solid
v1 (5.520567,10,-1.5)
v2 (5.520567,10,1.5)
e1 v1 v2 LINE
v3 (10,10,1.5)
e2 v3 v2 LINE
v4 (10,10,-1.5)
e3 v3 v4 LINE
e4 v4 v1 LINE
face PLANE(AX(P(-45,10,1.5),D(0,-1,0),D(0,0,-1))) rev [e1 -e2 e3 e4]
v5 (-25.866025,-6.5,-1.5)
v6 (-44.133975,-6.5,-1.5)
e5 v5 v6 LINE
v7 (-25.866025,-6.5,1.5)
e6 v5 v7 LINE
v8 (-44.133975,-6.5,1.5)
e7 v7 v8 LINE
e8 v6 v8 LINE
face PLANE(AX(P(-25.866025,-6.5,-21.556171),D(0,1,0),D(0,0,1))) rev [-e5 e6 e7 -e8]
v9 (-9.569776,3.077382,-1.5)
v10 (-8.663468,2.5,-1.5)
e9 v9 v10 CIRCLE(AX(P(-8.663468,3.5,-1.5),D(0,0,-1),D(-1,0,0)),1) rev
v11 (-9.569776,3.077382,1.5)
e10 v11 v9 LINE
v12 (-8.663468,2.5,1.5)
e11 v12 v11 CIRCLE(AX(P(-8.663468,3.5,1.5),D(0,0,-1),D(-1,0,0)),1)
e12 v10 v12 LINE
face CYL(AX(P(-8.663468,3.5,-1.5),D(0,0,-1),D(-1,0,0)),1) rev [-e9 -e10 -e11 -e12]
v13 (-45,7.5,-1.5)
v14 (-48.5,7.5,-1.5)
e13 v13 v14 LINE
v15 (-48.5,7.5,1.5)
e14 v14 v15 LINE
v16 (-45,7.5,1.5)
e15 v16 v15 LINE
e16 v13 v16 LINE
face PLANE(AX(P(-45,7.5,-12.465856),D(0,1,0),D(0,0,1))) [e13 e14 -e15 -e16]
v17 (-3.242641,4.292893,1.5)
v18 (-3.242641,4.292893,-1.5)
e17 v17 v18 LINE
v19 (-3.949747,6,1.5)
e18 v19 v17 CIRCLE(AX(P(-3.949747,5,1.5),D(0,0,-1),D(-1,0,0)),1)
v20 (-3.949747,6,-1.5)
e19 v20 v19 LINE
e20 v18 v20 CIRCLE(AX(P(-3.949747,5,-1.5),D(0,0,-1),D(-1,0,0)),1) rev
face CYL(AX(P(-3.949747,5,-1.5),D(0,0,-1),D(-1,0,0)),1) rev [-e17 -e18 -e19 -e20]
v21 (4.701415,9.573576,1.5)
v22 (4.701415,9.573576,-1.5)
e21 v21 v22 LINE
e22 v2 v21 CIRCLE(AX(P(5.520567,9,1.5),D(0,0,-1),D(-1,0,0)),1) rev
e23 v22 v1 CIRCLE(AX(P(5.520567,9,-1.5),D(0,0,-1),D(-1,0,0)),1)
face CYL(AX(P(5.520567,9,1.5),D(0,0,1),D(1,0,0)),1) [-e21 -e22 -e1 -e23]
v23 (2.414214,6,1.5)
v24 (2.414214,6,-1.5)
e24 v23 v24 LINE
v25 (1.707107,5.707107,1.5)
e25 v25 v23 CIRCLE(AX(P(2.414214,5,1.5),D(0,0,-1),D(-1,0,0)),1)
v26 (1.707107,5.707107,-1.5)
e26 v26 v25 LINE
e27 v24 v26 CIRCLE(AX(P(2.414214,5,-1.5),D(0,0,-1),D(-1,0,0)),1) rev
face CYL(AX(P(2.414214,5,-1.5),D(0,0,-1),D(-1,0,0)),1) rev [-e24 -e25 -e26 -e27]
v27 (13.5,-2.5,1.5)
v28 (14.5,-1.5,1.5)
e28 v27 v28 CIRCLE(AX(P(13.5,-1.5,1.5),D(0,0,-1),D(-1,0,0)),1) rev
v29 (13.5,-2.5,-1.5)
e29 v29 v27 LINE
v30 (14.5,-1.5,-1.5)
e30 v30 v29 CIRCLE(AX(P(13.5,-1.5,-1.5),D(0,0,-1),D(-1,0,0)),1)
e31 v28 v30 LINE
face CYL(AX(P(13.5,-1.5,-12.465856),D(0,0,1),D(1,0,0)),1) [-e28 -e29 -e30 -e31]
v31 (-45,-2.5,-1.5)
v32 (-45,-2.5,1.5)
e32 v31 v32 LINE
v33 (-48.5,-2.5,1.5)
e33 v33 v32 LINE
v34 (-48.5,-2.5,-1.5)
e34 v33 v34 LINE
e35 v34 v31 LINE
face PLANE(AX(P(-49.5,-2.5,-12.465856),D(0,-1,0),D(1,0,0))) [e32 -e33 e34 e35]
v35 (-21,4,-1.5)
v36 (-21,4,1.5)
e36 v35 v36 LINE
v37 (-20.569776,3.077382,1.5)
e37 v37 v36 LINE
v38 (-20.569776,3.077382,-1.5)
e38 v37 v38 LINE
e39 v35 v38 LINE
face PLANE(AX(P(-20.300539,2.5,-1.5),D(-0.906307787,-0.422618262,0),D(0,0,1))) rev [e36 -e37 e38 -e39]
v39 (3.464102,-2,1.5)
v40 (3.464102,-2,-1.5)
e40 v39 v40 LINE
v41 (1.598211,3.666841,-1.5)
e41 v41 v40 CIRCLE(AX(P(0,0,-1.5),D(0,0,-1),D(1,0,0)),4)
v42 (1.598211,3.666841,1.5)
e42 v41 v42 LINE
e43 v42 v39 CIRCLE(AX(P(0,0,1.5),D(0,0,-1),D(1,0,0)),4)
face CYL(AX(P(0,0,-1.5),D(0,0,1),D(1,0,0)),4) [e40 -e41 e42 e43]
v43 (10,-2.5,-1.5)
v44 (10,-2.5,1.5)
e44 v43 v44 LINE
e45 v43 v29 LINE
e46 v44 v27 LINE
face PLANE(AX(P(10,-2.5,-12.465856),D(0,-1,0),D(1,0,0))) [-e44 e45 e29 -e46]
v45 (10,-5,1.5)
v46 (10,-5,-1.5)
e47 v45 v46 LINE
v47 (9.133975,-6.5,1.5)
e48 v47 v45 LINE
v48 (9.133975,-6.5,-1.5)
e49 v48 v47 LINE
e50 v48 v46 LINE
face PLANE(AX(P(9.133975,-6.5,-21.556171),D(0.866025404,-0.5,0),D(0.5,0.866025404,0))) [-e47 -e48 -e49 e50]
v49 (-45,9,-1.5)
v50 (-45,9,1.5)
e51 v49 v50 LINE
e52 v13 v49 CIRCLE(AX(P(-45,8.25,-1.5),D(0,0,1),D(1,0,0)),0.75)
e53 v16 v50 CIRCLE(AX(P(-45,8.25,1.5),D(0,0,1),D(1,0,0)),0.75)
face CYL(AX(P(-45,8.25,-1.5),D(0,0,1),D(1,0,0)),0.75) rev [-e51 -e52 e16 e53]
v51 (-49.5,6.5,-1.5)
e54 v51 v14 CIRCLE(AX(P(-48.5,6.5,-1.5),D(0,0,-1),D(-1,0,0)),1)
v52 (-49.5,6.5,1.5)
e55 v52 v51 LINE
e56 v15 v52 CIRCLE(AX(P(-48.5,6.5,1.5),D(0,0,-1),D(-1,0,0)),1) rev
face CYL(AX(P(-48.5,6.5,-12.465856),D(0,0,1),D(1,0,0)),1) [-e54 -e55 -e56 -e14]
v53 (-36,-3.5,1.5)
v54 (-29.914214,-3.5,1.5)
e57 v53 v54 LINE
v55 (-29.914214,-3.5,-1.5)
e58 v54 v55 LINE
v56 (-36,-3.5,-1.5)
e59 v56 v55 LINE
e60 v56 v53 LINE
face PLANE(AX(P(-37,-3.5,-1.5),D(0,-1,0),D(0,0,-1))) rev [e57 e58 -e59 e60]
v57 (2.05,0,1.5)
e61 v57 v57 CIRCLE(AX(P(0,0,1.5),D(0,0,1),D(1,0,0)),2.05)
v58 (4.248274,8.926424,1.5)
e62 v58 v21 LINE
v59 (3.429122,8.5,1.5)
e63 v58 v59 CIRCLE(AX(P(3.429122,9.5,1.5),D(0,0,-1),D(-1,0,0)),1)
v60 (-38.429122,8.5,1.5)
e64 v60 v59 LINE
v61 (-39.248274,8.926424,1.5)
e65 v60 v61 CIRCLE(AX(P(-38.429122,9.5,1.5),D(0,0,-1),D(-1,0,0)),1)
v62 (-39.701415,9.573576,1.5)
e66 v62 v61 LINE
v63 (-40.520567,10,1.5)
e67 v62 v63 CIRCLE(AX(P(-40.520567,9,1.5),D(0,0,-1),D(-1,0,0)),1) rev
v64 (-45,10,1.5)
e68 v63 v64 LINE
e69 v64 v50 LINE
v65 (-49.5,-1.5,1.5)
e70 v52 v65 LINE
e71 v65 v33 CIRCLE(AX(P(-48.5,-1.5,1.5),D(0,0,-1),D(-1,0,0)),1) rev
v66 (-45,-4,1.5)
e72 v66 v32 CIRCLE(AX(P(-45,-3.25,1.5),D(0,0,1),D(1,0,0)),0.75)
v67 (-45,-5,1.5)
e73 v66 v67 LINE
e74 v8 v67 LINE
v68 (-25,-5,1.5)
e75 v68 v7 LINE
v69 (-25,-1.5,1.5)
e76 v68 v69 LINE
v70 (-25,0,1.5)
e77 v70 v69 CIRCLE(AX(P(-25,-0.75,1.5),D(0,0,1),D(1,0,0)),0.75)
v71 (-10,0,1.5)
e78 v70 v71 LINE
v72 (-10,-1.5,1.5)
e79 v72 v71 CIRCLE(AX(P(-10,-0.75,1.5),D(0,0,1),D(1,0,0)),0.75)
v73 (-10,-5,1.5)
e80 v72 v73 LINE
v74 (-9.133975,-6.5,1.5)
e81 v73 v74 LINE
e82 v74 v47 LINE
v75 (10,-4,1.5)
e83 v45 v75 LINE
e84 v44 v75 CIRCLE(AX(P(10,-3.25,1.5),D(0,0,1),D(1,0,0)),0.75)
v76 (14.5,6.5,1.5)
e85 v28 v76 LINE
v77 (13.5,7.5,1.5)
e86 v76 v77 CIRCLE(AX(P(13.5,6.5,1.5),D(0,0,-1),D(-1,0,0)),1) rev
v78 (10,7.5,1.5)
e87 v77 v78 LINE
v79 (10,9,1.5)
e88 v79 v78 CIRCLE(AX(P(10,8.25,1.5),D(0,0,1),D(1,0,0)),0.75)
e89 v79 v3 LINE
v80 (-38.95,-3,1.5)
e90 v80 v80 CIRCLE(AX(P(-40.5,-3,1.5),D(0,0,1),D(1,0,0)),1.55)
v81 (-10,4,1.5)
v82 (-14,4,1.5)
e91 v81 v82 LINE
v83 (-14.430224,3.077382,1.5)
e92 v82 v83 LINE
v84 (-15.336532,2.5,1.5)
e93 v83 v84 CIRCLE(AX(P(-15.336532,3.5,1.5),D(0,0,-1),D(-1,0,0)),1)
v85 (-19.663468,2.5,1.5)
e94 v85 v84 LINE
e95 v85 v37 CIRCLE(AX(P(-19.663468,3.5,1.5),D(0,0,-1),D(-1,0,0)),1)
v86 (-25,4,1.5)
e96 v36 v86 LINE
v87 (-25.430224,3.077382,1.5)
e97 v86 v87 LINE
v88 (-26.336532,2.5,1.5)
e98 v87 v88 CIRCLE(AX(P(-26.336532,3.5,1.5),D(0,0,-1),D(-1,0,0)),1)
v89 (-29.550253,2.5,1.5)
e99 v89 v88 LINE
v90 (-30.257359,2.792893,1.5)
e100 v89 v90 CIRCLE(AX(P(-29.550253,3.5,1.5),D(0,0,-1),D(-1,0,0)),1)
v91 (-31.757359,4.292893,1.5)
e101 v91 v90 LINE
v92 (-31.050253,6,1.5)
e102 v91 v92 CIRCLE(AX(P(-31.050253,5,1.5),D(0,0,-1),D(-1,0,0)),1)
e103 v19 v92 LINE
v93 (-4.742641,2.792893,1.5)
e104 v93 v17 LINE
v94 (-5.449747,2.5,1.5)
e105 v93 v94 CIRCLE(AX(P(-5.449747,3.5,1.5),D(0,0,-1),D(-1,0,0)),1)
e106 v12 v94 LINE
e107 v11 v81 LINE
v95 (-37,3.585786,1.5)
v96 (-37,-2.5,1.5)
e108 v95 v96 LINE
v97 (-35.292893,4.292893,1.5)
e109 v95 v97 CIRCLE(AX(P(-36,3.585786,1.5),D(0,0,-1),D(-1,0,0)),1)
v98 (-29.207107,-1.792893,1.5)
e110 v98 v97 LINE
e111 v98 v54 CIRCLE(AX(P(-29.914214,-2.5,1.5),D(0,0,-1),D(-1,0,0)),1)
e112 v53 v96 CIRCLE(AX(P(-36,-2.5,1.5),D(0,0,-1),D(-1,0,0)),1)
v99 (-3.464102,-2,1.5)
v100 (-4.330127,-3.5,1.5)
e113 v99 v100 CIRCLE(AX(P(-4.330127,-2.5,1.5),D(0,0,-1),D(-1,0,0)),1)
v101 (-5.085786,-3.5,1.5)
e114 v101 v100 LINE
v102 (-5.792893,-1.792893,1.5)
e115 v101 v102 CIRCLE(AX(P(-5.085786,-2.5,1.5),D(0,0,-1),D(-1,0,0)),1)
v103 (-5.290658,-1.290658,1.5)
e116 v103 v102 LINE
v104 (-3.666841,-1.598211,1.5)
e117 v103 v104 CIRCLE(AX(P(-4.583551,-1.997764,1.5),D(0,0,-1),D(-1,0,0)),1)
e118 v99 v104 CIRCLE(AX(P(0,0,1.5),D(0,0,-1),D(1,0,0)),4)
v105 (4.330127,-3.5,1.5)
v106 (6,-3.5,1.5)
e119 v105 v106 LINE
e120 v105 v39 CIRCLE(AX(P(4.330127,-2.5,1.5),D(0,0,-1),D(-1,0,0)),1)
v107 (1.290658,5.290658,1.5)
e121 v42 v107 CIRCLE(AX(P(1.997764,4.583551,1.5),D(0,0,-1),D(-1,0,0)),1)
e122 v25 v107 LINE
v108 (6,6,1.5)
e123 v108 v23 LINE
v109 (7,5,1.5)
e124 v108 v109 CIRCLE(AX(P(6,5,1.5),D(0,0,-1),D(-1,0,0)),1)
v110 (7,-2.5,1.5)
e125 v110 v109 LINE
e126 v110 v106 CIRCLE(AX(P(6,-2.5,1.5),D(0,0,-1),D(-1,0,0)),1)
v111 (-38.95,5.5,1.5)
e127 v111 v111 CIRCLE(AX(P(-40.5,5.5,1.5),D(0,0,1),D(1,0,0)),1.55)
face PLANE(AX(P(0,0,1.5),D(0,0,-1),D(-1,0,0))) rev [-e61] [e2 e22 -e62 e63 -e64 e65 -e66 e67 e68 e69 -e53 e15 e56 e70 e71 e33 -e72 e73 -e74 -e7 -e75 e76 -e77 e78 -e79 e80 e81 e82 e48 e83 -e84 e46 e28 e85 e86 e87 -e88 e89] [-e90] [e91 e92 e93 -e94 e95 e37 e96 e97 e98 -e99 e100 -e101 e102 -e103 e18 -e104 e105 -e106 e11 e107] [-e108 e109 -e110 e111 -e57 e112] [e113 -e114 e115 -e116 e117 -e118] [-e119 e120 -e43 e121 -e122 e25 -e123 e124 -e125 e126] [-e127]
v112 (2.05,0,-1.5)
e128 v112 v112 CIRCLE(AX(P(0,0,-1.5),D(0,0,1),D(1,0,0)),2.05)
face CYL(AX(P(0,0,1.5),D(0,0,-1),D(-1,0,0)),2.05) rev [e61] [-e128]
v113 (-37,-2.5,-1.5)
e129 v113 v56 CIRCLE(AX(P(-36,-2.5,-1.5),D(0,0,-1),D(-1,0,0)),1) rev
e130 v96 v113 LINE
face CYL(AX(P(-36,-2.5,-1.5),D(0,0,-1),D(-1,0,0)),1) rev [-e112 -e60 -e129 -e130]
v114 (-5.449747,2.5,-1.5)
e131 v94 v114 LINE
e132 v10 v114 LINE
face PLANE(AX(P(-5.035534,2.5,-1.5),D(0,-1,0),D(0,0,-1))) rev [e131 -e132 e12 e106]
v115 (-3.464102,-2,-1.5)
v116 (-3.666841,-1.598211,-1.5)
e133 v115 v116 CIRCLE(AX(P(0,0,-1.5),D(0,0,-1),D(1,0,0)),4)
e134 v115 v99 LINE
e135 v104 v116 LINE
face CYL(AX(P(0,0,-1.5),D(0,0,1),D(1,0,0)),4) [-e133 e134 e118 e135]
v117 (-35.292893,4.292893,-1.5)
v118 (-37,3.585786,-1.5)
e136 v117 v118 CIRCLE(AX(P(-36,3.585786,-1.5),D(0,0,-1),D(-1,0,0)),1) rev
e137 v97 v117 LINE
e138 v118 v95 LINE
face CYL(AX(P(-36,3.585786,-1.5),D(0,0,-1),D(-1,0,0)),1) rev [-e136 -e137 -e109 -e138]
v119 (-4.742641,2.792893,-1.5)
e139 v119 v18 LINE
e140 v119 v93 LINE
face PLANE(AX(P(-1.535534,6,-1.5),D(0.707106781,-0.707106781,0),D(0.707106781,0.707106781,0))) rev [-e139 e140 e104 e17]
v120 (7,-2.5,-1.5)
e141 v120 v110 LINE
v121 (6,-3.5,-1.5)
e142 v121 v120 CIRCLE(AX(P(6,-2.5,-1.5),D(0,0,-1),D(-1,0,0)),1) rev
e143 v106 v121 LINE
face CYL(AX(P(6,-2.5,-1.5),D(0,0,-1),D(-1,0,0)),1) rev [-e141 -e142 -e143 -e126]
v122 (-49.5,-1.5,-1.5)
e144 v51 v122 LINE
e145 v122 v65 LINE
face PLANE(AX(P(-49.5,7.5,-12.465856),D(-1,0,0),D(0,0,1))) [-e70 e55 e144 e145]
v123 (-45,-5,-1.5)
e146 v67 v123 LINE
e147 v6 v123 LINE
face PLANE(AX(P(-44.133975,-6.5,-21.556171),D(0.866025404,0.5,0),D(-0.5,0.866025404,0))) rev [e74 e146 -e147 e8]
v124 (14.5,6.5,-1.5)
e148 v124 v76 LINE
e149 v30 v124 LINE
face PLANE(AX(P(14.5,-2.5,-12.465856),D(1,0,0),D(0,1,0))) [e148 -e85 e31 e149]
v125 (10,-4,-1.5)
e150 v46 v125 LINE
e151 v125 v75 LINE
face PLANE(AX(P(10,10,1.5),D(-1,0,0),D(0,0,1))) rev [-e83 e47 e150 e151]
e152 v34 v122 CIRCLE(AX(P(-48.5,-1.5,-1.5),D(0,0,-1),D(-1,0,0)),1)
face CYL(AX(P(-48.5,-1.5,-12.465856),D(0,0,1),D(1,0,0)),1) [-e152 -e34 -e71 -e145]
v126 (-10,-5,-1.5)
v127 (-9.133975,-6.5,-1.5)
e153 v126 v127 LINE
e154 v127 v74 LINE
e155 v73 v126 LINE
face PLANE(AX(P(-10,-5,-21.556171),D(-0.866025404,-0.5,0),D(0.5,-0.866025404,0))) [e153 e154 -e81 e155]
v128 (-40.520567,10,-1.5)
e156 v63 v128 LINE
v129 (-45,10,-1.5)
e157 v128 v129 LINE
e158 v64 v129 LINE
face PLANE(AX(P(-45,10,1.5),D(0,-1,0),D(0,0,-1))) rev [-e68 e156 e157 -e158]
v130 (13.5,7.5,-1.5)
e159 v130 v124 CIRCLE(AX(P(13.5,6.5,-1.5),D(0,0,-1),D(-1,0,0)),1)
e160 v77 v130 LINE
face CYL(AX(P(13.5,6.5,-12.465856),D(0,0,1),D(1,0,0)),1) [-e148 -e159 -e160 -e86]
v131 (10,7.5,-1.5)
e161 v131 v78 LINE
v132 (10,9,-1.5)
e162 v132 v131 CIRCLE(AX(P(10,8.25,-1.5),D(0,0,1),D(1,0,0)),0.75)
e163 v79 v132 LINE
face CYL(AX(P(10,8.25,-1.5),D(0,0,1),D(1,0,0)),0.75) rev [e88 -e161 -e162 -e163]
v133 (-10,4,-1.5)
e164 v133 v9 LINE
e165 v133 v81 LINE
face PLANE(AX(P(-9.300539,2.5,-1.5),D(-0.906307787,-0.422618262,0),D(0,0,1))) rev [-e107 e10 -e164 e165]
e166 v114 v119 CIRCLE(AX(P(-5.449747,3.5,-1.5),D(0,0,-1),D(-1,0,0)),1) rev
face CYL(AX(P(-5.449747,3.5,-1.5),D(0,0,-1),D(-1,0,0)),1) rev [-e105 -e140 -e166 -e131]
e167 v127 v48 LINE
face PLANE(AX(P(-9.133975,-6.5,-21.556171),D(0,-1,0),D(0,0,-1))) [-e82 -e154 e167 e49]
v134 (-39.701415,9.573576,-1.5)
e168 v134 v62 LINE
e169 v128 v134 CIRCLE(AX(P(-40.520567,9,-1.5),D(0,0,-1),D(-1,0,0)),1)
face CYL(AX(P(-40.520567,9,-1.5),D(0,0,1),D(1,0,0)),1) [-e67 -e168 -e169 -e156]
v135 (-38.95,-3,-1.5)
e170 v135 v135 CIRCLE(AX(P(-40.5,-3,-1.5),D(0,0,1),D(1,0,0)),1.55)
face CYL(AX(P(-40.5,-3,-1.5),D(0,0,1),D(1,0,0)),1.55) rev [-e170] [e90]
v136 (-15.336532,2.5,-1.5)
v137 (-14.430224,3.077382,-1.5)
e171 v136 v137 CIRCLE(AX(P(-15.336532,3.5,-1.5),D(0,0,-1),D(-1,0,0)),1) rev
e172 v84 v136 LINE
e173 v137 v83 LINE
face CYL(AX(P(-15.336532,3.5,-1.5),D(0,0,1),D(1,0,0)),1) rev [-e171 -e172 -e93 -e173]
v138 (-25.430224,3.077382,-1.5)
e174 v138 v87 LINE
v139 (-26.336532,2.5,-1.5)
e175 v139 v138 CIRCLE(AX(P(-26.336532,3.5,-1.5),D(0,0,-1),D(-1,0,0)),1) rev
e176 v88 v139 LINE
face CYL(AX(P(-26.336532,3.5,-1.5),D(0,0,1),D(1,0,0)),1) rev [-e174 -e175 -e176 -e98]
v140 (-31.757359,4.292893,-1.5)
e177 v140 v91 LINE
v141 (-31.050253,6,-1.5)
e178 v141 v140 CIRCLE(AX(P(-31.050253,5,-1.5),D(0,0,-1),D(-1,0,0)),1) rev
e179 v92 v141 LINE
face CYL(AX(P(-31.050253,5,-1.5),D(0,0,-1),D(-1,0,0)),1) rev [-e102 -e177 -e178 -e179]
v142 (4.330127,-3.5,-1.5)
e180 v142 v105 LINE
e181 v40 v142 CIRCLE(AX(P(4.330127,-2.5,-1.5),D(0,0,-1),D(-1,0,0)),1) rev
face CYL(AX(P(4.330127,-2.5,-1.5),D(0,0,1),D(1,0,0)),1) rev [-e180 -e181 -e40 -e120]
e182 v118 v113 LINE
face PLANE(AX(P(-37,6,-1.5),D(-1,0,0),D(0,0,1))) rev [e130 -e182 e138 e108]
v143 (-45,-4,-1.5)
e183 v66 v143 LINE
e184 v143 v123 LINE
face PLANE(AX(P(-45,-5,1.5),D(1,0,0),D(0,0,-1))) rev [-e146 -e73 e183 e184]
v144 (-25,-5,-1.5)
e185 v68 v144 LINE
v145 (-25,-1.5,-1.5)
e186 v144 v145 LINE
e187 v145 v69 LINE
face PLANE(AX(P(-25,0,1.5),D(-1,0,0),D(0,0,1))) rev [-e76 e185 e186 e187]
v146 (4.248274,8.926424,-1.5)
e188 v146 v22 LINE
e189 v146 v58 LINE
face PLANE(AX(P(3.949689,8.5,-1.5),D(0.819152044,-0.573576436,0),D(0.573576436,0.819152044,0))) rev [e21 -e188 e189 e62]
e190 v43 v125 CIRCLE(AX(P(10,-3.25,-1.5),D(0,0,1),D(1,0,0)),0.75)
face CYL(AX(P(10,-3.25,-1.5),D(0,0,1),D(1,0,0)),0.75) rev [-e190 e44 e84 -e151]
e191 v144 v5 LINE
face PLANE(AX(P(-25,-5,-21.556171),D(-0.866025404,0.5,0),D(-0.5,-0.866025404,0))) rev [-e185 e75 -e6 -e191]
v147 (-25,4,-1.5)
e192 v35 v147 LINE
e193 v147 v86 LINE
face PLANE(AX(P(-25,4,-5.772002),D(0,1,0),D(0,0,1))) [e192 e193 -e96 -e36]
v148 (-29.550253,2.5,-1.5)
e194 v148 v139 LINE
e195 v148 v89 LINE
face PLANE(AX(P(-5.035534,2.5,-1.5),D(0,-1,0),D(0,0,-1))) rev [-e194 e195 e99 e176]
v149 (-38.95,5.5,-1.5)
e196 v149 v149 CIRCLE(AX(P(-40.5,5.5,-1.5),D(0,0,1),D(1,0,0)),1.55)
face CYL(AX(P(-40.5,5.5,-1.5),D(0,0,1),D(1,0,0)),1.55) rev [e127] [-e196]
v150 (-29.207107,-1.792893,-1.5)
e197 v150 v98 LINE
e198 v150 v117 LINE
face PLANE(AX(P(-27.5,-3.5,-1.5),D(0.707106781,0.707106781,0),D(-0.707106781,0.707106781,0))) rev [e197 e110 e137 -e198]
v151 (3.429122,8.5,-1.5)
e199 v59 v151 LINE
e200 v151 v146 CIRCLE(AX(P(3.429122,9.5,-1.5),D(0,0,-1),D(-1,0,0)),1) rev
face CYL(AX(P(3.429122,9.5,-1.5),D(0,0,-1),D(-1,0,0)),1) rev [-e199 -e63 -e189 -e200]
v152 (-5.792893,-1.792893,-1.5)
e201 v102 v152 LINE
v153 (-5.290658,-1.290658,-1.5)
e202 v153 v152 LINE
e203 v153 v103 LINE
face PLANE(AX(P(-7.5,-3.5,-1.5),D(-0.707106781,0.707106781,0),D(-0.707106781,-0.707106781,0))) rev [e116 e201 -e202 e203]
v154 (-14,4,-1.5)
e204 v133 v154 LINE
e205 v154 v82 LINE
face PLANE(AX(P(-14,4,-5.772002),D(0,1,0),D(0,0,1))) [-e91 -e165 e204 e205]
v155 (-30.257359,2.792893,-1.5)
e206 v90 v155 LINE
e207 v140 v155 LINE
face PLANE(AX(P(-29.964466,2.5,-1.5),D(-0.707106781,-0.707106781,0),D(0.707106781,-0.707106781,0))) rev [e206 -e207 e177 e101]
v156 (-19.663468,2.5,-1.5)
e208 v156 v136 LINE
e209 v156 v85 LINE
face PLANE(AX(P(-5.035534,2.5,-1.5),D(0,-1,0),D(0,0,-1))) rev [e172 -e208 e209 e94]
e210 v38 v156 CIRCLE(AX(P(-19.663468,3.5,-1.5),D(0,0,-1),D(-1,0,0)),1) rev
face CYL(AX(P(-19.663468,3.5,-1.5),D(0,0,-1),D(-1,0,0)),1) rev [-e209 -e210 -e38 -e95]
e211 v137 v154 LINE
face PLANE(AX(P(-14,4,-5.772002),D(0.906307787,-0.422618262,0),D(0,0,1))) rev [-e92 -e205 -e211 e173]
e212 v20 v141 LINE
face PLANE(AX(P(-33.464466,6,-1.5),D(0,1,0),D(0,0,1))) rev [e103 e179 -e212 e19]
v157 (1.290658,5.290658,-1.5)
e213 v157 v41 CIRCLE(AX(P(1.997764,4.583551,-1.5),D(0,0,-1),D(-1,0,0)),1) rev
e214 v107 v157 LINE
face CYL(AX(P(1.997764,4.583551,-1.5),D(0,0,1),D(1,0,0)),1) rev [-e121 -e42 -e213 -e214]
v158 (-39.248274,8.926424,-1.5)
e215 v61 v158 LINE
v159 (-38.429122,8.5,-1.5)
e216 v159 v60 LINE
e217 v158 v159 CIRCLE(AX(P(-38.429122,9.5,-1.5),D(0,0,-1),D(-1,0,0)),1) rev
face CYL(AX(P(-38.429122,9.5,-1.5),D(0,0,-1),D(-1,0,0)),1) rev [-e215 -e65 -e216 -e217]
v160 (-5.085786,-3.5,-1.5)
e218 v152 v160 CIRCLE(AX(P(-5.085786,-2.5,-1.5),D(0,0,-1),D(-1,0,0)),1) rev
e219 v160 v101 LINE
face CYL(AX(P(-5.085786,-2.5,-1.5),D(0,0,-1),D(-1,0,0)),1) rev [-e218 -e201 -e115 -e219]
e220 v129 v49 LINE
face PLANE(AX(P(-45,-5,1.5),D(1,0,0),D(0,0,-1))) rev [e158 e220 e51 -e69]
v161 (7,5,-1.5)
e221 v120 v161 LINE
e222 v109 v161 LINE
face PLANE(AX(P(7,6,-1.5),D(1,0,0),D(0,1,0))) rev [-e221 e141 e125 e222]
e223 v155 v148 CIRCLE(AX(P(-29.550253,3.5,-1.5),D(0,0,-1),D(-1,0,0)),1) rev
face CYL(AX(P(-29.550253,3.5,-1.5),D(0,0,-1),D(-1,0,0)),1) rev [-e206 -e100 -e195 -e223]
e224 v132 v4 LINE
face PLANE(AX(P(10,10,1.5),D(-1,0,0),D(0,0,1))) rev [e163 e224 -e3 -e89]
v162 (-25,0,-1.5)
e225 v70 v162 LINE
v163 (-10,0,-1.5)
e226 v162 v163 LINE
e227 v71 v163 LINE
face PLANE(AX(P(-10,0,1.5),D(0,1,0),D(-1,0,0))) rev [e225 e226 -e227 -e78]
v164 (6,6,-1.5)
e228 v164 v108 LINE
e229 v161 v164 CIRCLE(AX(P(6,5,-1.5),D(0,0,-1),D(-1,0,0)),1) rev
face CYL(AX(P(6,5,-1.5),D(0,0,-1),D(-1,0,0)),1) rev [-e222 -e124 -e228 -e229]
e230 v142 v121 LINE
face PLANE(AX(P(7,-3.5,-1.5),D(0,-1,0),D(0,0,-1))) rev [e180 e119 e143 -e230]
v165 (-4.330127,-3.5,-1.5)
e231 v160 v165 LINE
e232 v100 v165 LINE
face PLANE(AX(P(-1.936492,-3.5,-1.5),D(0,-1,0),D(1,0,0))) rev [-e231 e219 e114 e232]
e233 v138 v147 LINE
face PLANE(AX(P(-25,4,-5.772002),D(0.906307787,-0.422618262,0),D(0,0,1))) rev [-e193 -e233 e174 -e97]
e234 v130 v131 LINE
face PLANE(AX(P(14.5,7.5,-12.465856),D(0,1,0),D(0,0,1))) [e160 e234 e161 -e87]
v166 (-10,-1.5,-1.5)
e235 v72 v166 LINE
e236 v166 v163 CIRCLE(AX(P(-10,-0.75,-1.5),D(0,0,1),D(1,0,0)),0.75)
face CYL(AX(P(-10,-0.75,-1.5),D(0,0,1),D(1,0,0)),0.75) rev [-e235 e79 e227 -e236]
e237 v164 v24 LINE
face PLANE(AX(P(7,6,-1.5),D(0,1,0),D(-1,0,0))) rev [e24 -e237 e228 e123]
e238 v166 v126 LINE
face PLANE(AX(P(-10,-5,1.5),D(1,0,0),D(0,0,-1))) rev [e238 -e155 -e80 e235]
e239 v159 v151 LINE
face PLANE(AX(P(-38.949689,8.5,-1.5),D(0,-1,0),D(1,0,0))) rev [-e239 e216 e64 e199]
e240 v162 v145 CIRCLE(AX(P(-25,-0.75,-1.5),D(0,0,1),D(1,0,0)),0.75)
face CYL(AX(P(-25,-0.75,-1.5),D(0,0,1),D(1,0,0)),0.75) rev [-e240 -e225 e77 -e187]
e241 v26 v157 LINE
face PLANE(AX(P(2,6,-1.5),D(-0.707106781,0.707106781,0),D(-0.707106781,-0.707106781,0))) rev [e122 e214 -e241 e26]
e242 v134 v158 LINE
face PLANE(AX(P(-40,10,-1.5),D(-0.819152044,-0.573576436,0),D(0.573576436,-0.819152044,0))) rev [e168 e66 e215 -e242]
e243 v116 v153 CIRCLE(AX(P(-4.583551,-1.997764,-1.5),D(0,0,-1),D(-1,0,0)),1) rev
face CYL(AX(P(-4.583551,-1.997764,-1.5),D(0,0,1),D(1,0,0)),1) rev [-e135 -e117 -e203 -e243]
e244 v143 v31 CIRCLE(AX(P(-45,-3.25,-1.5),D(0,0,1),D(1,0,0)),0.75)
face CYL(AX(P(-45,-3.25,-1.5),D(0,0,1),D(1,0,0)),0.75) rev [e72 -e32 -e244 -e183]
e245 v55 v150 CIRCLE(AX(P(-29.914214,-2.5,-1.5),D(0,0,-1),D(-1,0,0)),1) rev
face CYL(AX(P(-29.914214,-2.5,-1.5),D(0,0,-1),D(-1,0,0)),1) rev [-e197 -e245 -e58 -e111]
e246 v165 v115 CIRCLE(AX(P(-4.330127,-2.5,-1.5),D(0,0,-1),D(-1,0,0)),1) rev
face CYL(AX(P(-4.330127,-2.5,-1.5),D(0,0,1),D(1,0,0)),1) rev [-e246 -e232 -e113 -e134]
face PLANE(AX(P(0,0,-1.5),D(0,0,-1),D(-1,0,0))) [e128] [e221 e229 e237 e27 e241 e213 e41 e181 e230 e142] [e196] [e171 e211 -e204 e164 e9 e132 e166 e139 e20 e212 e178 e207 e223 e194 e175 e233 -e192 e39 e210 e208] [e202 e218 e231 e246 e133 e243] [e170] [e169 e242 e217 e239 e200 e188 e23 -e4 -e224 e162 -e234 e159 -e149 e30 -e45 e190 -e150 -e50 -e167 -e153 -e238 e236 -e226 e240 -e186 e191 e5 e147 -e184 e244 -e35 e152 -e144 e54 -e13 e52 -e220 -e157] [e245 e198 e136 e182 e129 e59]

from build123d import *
from OCP.BRepFilletAPI import BRepFilletAPI_MakeChamfer

# Parameters (mm, degrees)
SKETCH_1_R          = 2.05
EXTRUDE_1_DEPTH     = 1.5
SKETCH_2_W          = 4.5
SKETCH_2_H          = 10
EXTRUDE_2_DEPTH     = 3
SKETCH_3_R          = 0.75
CUT_EXTRUDE_1_DEPTH = 51.589030432
FILLET_1_R          = 1
EXTRUDE_3_DEPTH     = 3
CUT_EXTRUDE_2_DEPTH = 51.589030432
FILLET_2_R          = 1
SKETCH_6_R          = 1.55
CUT_EXTRUDE_3_DEPTH = 51.589030432
CUT_EXTRUDE_4_DEPTH = 51.589030432
FILLET_3_R          = 1
CUT_EXTRUDE_5_DEPTH = 51.589030432
FILLET_4_R          = 1
SKETCH_9_W          = 4
SKETCH_9_H          = 1.5
EXTRUDE_4_DEPTH     = 3
CHAMFER_1_SIZE      = 0.699461487
CHAMFER_1_SIZE_2    = 1.5
FILLET_5_R          = 1


with BuildPart() as part:
    # 草图1 → 凸台-拉伸1 (new, symmetric)
    with BuildSketch(Plane.XY):
        Polygon((10, 10), (10, -5), (-10, -5), (-10, 0), (-25, 0), (-25, -5), (-45, -5), (-45, 10), align=None)
        Circle(SKETCH_1_R, mode=Mode.SUBTRACT)
    extrude(amount=EXTRUDE_1_DEPTH, both=True)

    # 草图2 → 凸台-拉伸2 (add)
    with BuildSketch(Plane.XY.offset(1.5)):
        with Locations((12.25, 2.5)):
            Rectangle(SKETCH_2_W, SKETCH_2_H)
        with Locations((-47.25, 2.5)):
            Rectangle(SKETCH_2_W, SKETCH_2_H)
    extrude(amount=-EXTRUDE_2_DEPTH)

    # 草图3 → 切除-拉伸1 (cut, through all)
    with BuildSketch(Plane.XY.offset(1.5)):
        with Locations((-45, 8.25)):
            Circle(SKETCH_3_R)
        with Locations((-45, -3.25)):
            Circle(SKETCH_3_R)
        with Locations((10, 8.25)):
            Circle(SKETCH_3_R)
        with Locations((10, -3.25)):
            Circle(SKETCH_3_R)
        with Locations((-25, -0.75)):
            Circle(SKETCH_3_R)
        with Locations((-10, -0.75)):
            Circle(SKETCH_3_R)
    extrude(amount=-CUT_EXTRUDE_1_DEPTH, mode=Mode.SUBTRACT)

    # 圆角1
    fillet_1_edges = [part.edges().sort_by_distance(p)[0] for p in [
        (14.5, -2.5, 0),
        (14.5, 7.5, 0),
        (-49.5, 7.5, 0),
        (-49.5, -2.5, 0),
    ]]
    fillet(fillet_1_edges, radius=FILLET_1_R)

    # 草图4 → 凸台-拉伸3 (add)
    with BuildSketch(Plane.XY.offset(1.5)):
        Polygon((-10, -5), (-9.133974596, -6.5), (9.133974596, -6.5), (10, -5), align=None)
    extrude_3 = extrude(amount=-EXTRUDE_3_DEPTH)

    # 镜向1: 凸台-拉伸3 across plane
    add(extrude_3.mirror(Plane(origin=(-17.5, 0, 0), x_dir=(0, 0, 1), z_dir=(1, 0, 0))))

    # 草图5 → 切除-拉伸2 (cut, through all)
    with BuildSketch(Plane.XY.offset(1.5)):
        Polygon((-40, 10), (-38.949688693, 8.5), (3.949688693, 8.5), (5, 10), align=None)
    extrude(amount=-CUT_EXTRUDE_2_DEPTH, mode=Mode.SUBTRACT)

    # 圆角2
    fillet_2_edges = [part.edges().sort_by_distance(p)[0] for p in [
        (-40, 10, 0),
        (5, 10, 0),
        (3.949688693, 8.5, 0),
        (-38.949688693, 8.5, 0),
    ]]
    fillet(fillet_2_edges, radius=FILLET_2_R)

    # 草图6 → 切除-拉伸3 (cut, through all)
    with BuildSketch(Plane.XY.offset(1.5)):
        with Locations((-40.5, 5.5)):
            Circle(SKETCH_6_R)
        with Locations((-40.5, -3)):
            Circle(SKETCH_6_R)
    extrude(amount=-CUT_EXTRUDE_3_DEPTH, mode=Mode.SUBTRACT)

    # 草图7 → 切除-拉伸4 (cut, through all)
    with BuildSketch(Plane.XY.offset(1.5)):
        Polygon((-37, 6), (-37, -3.5), (-27.5, -3.5), align=None)
        Polygon((-33.464466094, 6), (-1.535533906, 6), (-5.035533906, 2.5), (-29.964466094, 2.5), align=None)
    extrude(amount=-CUT_EXTRUDE_4_DEPTH, mode=Mode.SUBTRACT)

    # 圆角3
    fillet_3_edges = [part.edges().sort_by_distance(p)[0] for p in [
        (-29.964466094, 2.5, 0),
        (-33.464466094, 6, 0),
        (-1.535533906, 6, 0),
        (-5.035533906, 2.5, 0),
        (-37, 6, 0),
        (-27.5, -3.5, 0),
        (-37, -3.5, 0),
    ]]
    fillet(fillet_3_edges, radius=FILLET_3_R)

    # 草图8 → 切除-拉伸5 (cut, through all)
    with BuildSketch(Plane.XY.offset(1.5)):
        with BuildLine():
            Line((7, 6), (7, -3.5))
            Line((7, -3.5), (1.936491673, -3.5))
            ThreePointArc((1.936491673, -3.5), (3.872983346, 1), (0, 4))
            Line((0, 4), (2, 6))
            Line((2, 6), (7, 6))
        make_face()
        with BuildLine():
            Line((-1.936491673, -3.5), (-7.5, -3.5))
            Line((-7.5, -3.5), (-4, 0))
            ThreePointArc((-4, 0), (-3.445719569, -2.031506006), (-1.936491673, -3.5))
        make_face()
    extrude(amount=-CUT_EXTRUDE_5_DEPTH, mode=Mode.SUBTRACT)

    # 圆角4
    fillet_4_edges = [part.edges().sort_by_distance(p)[0] for p in [
        (2, 6, 0),
        (7, 6, 0),
        (7, -3.5, 0),
        (1.936491673, -3.5, 0),
        (0, 4, 0),
        (-4, 0, 0),
        (-1.936491673, -3.5, 0),
        (-7.5, -3.5, 0),
    ]]
    fillet(fillet_4_edges, radius=FILLET_4_R)

    # 草图9 → 凸台-拉伸4 (add)
    with BuildSketch(Plane.XY.offset(1.5)):
        with Locations((-23, 3.25)):
            Rectangle(SKETCH_9_W, SKETCH_9_H)
        with Locations((-12, 3.25)):
            Rectangle(SKETCH_9_W, SKETCH_9_H)
    extrude(amount=-EXTRUDE_4_DEPTH)

    # 倒角1
    chamfer_1_edges_1 = [part.edges().sort_by_distance(p)[0] for p in [
        (-14, 2.5, 0),
    ]]
    chamfer_1_side_1 = [part.faces().sort_by_distance(p)[0] for p in [
        (-14.01398923, 2.5, 0),
    ]]
    chamfer_1_edges_2 = [part.edges().sort_by_distance(p)[0] for p in [
        (-10, 2.5, 0),
    ]]
    chamfer_1_side_2 = [part.faces().sort_by_distance(p)[0] for p in [
        (-9.98601077, 2.5, 0),
    ]]
    chamfer_1_edges_3 = [part.edges().sort_by_distance(p)[0] for p in [
        (-21, 2.5, 0),
    ]]
    chamfer_1_side_3 = [part.faces().sort_by_distance(p)[0] for p in [
        (-20.98601077, 2.5, 0),
    ]]
    chamfer_1_edges_4 = [part.edges().sort_by_distance(p)[0] for p in [
        (-25, 2.5, 0),
    ]]
    chamfer_1_side_4 = [part.faces().sort_by_distance(p)[0] for p in [
        (-25.01398923, 2.5, 0),
    ]]
    chamfer_1 = BRepFilletAPI_MakeChamfer(part.part.solid().wrapped)
    for e in chamfer_1_edges_1:
        chamfer_1.Add(CHAMFER_1_SIZE - 0.0001, CHAMFER_1_SIZE_2 - 0.0001, e.wrapped, chamfer_1_side_1[0].wrapped)
    for e in chamfer_1_edges_2:
        chamfer_1.Add(CHAMFER_1_SIZE - 0.0001, CHAMFER_1_SIZE_2 - 0.0001, e.wrapped, chamfer_1_side_2[0].wrapped)
    for e in chamfer_1_edges_3:
        chamfer_1.Add(CHAMFER_1_SIZE - 0.0001, CHAMFER_1_SIZE_2 - 0.0001, e.wrapped, chamfer_1_side_3[0].wrapped)
    for e in chamfer_1_edges_4:
        chamfer_1.Add(CHAMFER_1_SIZE - 0.0001, CHAMFER_1_SIZE_2 - 0.0001, e.wrapped, chamfer_1_side_4[0].wrapped)
    add(Compound.cast(chamfer_1.Shape()), mode=Mode.REPLACE)  # a hair under: the kernel refuses the full size

    # 圆角5
    fillet_5_edges = [part.edges().sort_by_distance(p)[0] for p in [
        (-20.300638513, 2.5, 0),
        (-14.699361487, 2.5, 0),
        (-9.300638513, 2.5, 0),
        (-25.699361487, 2.5, 0),
    ]]
    fillet(fillet_5_edges, radius=FILLET_5_R)


solid = part.part
